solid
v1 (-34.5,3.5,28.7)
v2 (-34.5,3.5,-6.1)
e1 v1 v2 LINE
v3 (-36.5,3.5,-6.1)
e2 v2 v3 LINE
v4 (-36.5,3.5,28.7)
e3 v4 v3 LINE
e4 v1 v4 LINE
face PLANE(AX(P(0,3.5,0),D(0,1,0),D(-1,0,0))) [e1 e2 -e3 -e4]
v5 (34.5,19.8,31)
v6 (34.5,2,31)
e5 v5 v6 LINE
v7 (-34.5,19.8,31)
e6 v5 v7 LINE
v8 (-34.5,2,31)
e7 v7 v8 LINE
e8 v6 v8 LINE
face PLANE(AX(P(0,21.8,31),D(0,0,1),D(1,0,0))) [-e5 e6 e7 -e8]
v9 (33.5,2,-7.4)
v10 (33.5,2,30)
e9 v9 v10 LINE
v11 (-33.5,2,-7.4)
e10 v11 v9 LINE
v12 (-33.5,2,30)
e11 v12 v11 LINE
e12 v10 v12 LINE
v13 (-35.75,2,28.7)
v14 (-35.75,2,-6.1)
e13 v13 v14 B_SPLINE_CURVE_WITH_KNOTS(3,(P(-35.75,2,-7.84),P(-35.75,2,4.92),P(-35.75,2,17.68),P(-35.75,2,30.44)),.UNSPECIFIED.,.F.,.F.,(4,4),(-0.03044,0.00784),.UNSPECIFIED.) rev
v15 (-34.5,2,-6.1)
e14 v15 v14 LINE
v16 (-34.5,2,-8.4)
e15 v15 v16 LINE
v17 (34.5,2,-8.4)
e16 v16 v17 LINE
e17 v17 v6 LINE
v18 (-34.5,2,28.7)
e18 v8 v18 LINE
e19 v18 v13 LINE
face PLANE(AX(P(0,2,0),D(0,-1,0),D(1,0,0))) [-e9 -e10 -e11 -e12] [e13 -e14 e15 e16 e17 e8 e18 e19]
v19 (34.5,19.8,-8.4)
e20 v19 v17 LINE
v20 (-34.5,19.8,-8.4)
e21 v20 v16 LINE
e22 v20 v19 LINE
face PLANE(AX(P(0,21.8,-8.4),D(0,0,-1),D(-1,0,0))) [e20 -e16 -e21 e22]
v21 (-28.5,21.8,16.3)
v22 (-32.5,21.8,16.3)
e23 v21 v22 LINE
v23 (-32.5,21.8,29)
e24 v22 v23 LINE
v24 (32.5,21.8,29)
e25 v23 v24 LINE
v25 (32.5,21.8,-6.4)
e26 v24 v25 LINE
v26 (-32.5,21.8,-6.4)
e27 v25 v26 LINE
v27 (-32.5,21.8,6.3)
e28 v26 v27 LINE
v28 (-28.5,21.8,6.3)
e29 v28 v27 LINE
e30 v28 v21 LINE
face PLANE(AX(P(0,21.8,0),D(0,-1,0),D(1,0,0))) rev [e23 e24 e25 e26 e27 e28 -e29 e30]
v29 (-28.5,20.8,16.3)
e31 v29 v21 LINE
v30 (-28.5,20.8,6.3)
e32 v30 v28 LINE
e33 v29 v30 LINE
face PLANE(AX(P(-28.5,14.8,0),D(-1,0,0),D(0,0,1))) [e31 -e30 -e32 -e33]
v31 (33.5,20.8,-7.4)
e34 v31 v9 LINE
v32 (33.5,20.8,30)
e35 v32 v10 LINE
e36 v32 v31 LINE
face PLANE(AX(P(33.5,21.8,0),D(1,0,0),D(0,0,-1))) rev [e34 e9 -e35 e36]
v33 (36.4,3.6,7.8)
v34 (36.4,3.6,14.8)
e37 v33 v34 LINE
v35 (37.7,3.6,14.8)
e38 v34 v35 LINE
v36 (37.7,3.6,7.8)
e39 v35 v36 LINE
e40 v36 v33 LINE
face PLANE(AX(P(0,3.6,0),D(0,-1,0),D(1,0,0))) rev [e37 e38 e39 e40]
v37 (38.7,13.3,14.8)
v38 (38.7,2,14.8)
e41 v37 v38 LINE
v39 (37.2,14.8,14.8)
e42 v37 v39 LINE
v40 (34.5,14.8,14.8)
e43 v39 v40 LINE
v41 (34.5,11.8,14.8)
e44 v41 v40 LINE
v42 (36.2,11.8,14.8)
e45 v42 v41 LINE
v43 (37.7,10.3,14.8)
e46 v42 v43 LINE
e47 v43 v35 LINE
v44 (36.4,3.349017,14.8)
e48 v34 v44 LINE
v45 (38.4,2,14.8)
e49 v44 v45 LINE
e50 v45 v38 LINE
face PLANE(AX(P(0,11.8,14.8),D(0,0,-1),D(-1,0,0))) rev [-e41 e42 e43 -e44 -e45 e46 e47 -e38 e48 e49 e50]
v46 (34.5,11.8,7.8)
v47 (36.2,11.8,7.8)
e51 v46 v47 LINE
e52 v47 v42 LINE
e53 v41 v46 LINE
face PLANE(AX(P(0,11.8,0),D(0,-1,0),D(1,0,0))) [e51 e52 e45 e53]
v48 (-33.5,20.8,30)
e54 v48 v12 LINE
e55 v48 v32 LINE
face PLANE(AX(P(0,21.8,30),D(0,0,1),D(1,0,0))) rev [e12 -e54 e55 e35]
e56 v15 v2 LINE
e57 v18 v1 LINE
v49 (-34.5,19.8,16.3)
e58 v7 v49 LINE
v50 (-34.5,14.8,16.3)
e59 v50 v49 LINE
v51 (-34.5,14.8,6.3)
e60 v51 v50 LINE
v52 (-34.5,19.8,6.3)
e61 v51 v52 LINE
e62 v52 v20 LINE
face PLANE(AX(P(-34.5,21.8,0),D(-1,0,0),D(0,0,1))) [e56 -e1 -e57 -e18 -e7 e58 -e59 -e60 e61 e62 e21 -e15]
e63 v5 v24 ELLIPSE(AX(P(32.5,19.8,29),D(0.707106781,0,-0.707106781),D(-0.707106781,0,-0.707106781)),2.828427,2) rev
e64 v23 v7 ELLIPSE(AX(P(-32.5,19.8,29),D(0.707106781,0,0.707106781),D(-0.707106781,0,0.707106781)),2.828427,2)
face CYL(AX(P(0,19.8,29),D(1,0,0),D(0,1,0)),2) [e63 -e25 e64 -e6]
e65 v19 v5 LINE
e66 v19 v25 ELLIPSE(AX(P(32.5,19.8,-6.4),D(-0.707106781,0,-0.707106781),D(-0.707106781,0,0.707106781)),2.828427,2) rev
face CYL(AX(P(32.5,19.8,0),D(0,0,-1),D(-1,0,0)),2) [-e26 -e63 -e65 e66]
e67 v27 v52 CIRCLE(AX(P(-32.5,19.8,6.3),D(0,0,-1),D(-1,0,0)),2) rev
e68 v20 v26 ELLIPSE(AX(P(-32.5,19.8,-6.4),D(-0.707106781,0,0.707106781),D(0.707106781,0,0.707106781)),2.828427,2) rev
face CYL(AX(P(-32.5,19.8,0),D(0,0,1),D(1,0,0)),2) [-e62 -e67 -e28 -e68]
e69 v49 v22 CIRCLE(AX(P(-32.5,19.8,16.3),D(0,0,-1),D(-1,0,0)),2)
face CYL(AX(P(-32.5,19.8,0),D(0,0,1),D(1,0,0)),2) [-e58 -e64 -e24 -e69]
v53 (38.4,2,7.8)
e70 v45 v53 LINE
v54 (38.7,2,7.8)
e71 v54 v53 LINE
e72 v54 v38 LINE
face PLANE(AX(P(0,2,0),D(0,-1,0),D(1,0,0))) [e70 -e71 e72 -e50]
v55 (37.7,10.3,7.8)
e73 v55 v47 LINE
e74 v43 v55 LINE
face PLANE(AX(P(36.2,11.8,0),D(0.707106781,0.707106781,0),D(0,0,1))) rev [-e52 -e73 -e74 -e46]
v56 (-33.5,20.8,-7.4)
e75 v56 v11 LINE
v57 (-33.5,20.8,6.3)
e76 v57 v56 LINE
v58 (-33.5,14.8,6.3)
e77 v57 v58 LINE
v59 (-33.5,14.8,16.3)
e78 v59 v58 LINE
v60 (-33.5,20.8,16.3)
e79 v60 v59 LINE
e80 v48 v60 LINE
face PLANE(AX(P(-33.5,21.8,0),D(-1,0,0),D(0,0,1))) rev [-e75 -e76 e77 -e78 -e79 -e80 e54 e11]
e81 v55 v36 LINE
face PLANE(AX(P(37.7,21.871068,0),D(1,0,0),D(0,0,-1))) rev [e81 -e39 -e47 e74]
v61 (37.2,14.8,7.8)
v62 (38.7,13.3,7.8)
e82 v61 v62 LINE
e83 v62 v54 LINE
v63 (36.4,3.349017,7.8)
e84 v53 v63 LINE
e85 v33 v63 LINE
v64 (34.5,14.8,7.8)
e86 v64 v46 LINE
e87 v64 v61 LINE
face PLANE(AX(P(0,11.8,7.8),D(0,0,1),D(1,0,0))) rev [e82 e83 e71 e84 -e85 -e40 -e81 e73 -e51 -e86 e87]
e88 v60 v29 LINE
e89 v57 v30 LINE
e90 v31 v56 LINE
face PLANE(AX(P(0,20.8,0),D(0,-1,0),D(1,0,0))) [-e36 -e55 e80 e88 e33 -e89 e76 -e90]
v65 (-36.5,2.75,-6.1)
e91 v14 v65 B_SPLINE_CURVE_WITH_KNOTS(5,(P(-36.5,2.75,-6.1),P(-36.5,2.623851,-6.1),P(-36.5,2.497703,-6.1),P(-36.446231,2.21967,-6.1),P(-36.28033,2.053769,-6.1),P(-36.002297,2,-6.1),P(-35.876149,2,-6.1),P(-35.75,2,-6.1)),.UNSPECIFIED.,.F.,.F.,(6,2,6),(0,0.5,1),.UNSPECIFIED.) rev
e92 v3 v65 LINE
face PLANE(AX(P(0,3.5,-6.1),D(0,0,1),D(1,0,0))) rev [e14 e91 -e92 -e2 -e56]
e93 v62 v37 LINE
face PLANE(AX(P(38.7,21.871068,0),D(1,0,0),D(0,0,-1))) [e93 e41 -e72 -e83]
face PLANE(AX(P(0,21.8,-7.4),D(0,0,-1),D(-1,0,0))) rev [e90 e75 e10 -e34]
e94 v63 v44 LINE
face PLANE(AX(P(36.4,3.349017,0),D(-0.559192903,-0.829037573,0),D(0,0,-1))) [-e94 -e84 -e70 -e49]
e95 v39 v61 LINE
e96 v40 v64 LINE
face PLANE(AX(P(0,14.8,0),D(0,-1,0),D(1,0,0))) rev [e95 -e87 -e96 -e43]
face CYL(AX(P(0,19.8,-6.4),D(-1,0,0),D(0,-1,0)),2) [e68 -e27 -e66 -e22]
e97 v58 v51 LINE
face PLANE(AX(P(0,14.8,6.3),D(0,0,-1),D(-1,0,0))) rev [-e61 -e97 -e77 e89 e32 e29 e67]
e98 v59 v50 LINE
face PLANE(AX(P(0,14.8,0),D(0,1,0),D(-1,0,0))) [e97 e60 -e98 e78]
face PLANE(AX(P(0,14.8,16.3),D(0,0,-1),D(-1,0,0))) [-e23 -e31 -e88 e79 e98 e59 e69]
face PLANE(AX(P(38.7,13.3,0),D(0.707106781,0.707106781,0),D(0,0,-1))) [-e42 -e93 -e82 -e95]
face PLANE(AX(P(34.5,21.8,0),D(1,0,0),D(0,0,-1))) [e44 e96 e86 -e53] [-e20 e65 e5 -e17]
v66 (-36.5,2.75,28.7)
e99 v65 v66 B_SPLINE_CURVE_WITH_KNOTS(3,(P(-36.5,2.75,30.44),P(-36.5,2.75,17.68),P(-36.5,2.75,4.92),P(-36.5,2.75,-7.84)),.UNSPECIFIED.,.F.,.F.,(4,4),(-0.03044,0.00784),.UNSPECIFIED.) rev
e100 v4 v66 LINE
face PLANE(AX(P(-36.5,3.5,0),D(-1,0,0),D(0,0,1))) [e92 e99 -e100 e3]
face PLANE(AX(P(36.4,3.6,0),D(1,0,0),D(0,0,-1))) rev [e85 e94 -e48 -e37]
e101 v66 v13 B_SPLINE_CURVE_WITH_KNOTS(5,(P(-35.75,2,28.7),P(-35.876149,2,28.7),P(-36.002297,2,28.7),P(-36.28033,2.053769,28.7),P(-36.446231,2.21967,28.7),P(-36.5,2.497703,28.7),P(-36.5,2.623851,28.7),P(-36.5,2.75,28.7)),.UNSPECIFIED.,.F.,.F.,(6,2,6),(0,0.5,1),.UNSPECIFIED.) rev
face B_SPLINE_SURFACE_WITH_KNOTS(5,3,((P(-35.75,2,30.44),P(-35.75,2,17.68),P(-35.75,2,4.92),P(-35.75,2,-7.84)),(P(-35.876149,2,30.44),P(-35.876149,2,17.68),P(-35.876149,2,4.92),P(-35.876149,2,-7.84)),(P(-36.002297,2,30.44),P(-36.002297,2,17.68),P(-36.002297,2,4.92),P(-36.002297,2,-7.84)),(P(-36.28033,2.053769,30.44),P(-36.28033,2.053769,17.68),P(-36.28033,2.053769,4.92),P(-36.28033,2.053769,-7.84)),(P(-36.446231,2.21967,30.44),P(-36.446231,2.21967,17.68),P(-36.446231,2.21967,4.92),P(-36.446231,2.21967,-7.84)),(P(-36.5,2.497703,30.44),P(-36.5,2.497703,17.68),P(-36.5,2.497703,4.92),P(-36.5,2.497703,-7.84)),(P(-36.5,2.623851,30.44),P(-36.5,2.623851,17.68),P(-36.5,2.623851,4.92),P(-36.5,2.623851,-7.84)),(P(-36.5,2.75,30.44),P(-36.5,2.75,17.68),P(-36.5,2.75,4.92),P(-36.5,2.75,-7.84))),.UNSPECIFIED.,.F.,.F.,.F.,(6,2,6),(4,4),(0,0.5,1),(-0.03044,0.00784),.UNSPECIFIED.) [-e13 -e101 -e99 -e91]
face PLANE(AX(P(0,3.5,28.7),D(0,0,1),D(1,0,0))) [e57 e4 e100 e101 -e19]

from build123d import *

# Parameters (mm, degrees)
EXTRUDE_THIN_START                    = 2
EXTRUDE_THIN_HOLDER_WALLS_OUTLINE_W   = 69
EXTRUDE_THIN_HOLDER_WALLS_OUTLINE_H   = 39.4
EXTRUDE_THIN_HOLDER_WALLS_OUTLINE_W_2 = 67
EXTRUDE_THIN_HOLDER_WALLS_OUTLINE_H_2 = 37.4
EXTRUDE_THIN_HOLDER_WALLS_DEPTH       = 19.8
BOSS_EXTRUDE_START                    = 20.8
BATTERY_HOLDER_AREA_8_W               = 28.6
BATTERY_HOLDER_AREA_8_H               = 37.4
BATTERY_HOLDER_AREA_8_W_2             = 5
BATTERY_HOLDER_AREA_8_H_2             = 10
BOSS_EXTRUDE_HOLDER_TOP_DEPTH         = 1
CUT_EXTRUDE_START                     = 14.8
BATTERY_HOLDER_AREA_6_W               = 1
BATTERY_HOLDER_AREA_6_H               = 10
BATTERY_HOLDER_AREA_6_W_2             = 5
CUT_EXTRUDE_BATTERY_CABLE_DEPTH       = 7
BOSS_EXTRUDE_START_2                  = 2
BOSS_EXTRUDE_SLIDE_CLAMP_DEPTH        = 1.5
FILLET_SLIDE_CLAMP_SIZE               = 0.75
FILLET_HOLDER_EDGES_R                 = 2
BATTERY_HOLDER_AREA_6_2_W             = 1
BATTERY_HOLDER_AREA_6_2_H             = 7
EXTRUDE_THIN_HOLDER_CLIPS_DEPTH       = 12.8
BOSS_EXTRUDE_START_3                  = 14.8
BATTERY_HOLDER_AREA_6_3_W             = 3
BATTERY_HOLDER_AREA_6_3_H             = 7
BATTERY_HOLDER_AREA_6_3_W_2           = 1.2
BOSS_EXTRUDE_HOLDER_CLIP_BASES_DEPTH  = 3
CHAMFER_HOLDER_CLIP_BASES_SIZE        = 1.5
BATTERY_HOLDER_AREA_6_4_W             = 2.3
BATTERY_HOLDER_AREA_6_4_H             = 7
EXTRUDE_THIN_HOLDER_CLIP_HOOK_DEPTH   = 1.6
CHAMFER_HOLDER_CLIP_HOOK_SIZE         = 1.349017034
CHAMFER_HOLDER_CLIP_HOOK_SIZE2        = 2


with BuildPart() as part:
    # Extrude-Thin holder walls: read off the stored shape, not the designer's step
    # Extrude-Thin holder walls outline → Extrude-Thin holder walls (new body)
    with BuildSketch(Plane(origin=(0, 0, 0), x_dir=(1, 0, 0), z_dir=(0, 1, 0)).offset(EXTRUDE_THIN_START)):
        with Locations((0, -11.3)):
            Rectangle(EXTRUDE_THIN_HOLDER_WALLS_OUTLINE_W, EXTRUDE_THIN_HOLDER_WALLS_OUTLINE_H)
        with Locations((0, -11.3)):
            Rectangle(EXTRUDE_THIN_HOLDER_WALLS_OUTLINE_W_2, EXTRUDE_THIN_HOLDER_WALLS_OUTLINE_H_2, mode=Mode.SUBTRACT)
    extrude(amount=EXTRUDE_THIN_HOLDER_WALLS_DEPTH)

    # Battery holder area_8 → Boss-Extrude holder top (add)
    with BuildSketch(Plane(origin=(0, 0, 0), x_dir=(1, 0, 0), z_dir=(0, 1, 0)).offset(BOSS_EXTRUDE_START)):
        Polygon((0, -30), (0, 7.4), (-33.5, 7.4), (-33.5, 6.1), (-33.5, -6.3), (-28.5, -6.3), (-28.5, -16.3), (-33.5, -16.3), (-33.5, -28.7), (-33.5, -30), align=None)
        with Locations((14.3, -11.3)):
            Rectangle(BATTERY_HOLDER_AREA_8_W, BATTERY_HOLDER_AREA_8_H)
        Polygon((33.5, 7.4), (28.6, 7.4), (28.6, -30), (33.5, -30), (33.5, -14.8), (33.5, -7.8), align=None)
        with Locations((-31, -11.3)):
            Rectangle(BATTERY_HOLDER_AREA_8_W_2, BATTERY_HOLDER_AREA_8_H_2)
    extrude(amount=BOSS_EXTRUDE_HOLDER_TOP_DEPTH)

    # Battery holder area_6 → Cut-Extrude battery cable (cut)
    with BuildSketch(Plane(origin=(0, 0, 0), x_dir=(1, 0, 0), z_dir=(0, 1, 0)).offset(CUT_EXTRUDE_START)):
        with Locations((-34, -11.3)):
            Rectangle(BATTERY_HOLDER_AREA_6_W, BATTERY_HOLDER_AREA_6_H)
        with Locations((-31, -11.3)):
            Rectangle(BATTERY_HOLDER_AREA_6_W_2, BATTERY_HOLDER_AREA_6_H)
    extrude(amount=CUT_EXTRUDE_BATTERY_CABLE_DEPTH, mode=Mode.SUBTRACT)

    # Battery holder area_8 2 → Boss-Extrude slide clamp (add)
    with BuildSketch(Plane(origin=(0, 0, 0), x_dir=(1, 0, 0), z_dir=(0, 1, 0)).offset(BOSS_EXTRUDE_START_2)):
        Polygon((-36.5, -28.7), (-33.5, -28.7), (-33.5, -16.3), (-34.5, -16.3), (-34.5, -6.3), (-33.5, -6.3), (-33.5, 6.1), (-36.5, 6.1), align=None)
    extrude(amount=BOSS_EXTRUDE_SLIDE_CLAMP_DEPTH)

    # Fillet slide clamp
    # a fillet whose section is not a circle: 0.75 mm, written as the material it takes off along each edge
    with BuildSketch(Plane(origin=(-36.5, 2, -7.975), x_dir=(0, 1, 0), z_dir=(0, 0, 1))) as fillet_slide_clamp_piece_1:
        with BuildLine():
            add(Edge.make_bspline([(FILLET_SLIDE_CLAMP_SIZE, 0), (FILLET_SLIDE_CLAMP_SIZE * 0.831801948466, 0), (FILLET_SLIDE_CLAMP_SIZE * 0.663603896932, 0), (FILLET_SLIDE_CLAMP_SIZE * 0.292893218813, -FILLET_SLIDE_CLAMP_SIZE * 0.0716919198361), (FILLET_SLIDE_CLAMP_SIZE * 0.0716919198361, -FILLET_SLIDE_CLAMP_SIZE * 0.292893218813), (0, -FILLET_SLIDE_CLAMP_SIZE * 0.663603896932), (0, -FILLET_SLIDE_CLAMP_SIZE * 0.831801948466), (0, -FILLET_SLIDE_CLAMP_SIZE)], knots=[0, 0, 0, 0, 0, 0, 0.5, 0.5, 1, 1, 1, 1, 1, 1], degree=5))
            Line((0, -FILLET_SLIDE_CLAMP_SIZE), (0, 0))
            Line((0, 0), (FILLET_SLIDE_CLAMP_SIZE, 0))
        make_face()
    extrude(amount=38.55, mode=Mode.SUBTRACT)

    # Fillet holder edges
    fillet_holder_edges_edges = [part.edges().sort_by_distance(p)[0] for p in [
        (34.5, 21.8, 11.3),
        (0, 21.8, 31),
        (-34.5, 21.8, 23.65),
        (0, 21.8, -8.4),
        (-34.5, 21.8, -1.05),
    ]]
    fillet(fillet_holder_edges_edges, radius=FILLET_HOLDER_EDGES_R)



with BuildPart() as body_2:
    # Battery holder area_6 2 → Extrude-Thin holder clips (new body)
    with BuildSketch(Plane(origin=(0, 0, 0), x_dir=(1, 0, 0), z_dir=(0, 1, 0)).offset(EXTRUDE_THIN_START)):
        with Locations((38.2, -11.3)):
            Rectangle(BATTERY_HOLDER_AREA_6_2_W, BATTERY_HOLDER_AREA_6_2_H)
    extrude(amount=EXTRUDE_THIN_HOLDER_CLIPS_DEPTH)


with BuildPart() as part_1:
    add(part.part)

    add(body_2.part)  # Boss-Extrude holder clip bases merges body 2
    # Battery holder area_6 3 → Boss-Extrude holder clip bases (add)
    with BuildSketch(Plane(origin=(0, 0, 0), x_dir=(1, 0, 0), z_dir=(0, 1, 0)).offset(BOSS_EXTRUDE_START_3)):
        with Locations((36.2, -11.3)):
            Rectangle(BATTERY_HOLDER_AREA_6_3_W, BATTERY_HOLDER_AREA_6_3_H)
        with Locations((34.1, -11.3)):
            Rectangle(BATTERY_HOLDER_AREA_6_3_W_2, BATTERY_HOLDER_AREA_6_3_H)
    extrude(amount=-BOSS_EXTRUDE_HOLDER_CLIP_BASES_DEPTH)

    # Chamfer holder clip bases
    chamfer_holder_clip_bases_edges = [part_1.edges().sort_by_distance(p)[0] for p in [
        (37.7, 11.8, 11.3),
        (38.7, 14.8, 11.3),
    ]]
    chamfer(chamfer_holder_clip_bases_edges, length=CHAMFER_HOLDER_CLIP_BASES_SIZE)

    # Battery holder area_6 4 → Extrude-Thin holder clip hook (add)
    with BuildSketch(Plane(origin=(0, 0, 0), x_dir=(1, 0, 0), z_dir=(0, 1, 0)).offset(EXTRUDE_THIN_START)):
        with Locations((37.55, -11.3)):
            Rectangle(BATTERY_HOLDER_AREA_6_4_W, BATTERY_HOLDER_AREA_6_4_H)
    extrude(amount=EXTRUDE_THIN_HOLDER_CLIP_HOOK_DEPTH)

    # Chamfer holder clip hook
    chamfer_holder_clip_hook_edges = [part_1.edges().sort_by_distance(p)[0] for p in [
        (36.4, 2, 11.3),
    ]]
    chamfer_holder_clip_hook_side = [part_1.faces().sort_by_distance(p)[0] for p in [
        (36.4, 2.8, 11.3),
    ]]
    chamfer(chamfer_holder_clip_hook_edges, length=CHAMFER_HOLDER_CLIP_HOOK_SIZE, length2=CHAMFER_HOLDER_CLIP_HOOK_SIZE2, reference=chamfer_holder_clip_hook_side[0])


solid = part_1.part
